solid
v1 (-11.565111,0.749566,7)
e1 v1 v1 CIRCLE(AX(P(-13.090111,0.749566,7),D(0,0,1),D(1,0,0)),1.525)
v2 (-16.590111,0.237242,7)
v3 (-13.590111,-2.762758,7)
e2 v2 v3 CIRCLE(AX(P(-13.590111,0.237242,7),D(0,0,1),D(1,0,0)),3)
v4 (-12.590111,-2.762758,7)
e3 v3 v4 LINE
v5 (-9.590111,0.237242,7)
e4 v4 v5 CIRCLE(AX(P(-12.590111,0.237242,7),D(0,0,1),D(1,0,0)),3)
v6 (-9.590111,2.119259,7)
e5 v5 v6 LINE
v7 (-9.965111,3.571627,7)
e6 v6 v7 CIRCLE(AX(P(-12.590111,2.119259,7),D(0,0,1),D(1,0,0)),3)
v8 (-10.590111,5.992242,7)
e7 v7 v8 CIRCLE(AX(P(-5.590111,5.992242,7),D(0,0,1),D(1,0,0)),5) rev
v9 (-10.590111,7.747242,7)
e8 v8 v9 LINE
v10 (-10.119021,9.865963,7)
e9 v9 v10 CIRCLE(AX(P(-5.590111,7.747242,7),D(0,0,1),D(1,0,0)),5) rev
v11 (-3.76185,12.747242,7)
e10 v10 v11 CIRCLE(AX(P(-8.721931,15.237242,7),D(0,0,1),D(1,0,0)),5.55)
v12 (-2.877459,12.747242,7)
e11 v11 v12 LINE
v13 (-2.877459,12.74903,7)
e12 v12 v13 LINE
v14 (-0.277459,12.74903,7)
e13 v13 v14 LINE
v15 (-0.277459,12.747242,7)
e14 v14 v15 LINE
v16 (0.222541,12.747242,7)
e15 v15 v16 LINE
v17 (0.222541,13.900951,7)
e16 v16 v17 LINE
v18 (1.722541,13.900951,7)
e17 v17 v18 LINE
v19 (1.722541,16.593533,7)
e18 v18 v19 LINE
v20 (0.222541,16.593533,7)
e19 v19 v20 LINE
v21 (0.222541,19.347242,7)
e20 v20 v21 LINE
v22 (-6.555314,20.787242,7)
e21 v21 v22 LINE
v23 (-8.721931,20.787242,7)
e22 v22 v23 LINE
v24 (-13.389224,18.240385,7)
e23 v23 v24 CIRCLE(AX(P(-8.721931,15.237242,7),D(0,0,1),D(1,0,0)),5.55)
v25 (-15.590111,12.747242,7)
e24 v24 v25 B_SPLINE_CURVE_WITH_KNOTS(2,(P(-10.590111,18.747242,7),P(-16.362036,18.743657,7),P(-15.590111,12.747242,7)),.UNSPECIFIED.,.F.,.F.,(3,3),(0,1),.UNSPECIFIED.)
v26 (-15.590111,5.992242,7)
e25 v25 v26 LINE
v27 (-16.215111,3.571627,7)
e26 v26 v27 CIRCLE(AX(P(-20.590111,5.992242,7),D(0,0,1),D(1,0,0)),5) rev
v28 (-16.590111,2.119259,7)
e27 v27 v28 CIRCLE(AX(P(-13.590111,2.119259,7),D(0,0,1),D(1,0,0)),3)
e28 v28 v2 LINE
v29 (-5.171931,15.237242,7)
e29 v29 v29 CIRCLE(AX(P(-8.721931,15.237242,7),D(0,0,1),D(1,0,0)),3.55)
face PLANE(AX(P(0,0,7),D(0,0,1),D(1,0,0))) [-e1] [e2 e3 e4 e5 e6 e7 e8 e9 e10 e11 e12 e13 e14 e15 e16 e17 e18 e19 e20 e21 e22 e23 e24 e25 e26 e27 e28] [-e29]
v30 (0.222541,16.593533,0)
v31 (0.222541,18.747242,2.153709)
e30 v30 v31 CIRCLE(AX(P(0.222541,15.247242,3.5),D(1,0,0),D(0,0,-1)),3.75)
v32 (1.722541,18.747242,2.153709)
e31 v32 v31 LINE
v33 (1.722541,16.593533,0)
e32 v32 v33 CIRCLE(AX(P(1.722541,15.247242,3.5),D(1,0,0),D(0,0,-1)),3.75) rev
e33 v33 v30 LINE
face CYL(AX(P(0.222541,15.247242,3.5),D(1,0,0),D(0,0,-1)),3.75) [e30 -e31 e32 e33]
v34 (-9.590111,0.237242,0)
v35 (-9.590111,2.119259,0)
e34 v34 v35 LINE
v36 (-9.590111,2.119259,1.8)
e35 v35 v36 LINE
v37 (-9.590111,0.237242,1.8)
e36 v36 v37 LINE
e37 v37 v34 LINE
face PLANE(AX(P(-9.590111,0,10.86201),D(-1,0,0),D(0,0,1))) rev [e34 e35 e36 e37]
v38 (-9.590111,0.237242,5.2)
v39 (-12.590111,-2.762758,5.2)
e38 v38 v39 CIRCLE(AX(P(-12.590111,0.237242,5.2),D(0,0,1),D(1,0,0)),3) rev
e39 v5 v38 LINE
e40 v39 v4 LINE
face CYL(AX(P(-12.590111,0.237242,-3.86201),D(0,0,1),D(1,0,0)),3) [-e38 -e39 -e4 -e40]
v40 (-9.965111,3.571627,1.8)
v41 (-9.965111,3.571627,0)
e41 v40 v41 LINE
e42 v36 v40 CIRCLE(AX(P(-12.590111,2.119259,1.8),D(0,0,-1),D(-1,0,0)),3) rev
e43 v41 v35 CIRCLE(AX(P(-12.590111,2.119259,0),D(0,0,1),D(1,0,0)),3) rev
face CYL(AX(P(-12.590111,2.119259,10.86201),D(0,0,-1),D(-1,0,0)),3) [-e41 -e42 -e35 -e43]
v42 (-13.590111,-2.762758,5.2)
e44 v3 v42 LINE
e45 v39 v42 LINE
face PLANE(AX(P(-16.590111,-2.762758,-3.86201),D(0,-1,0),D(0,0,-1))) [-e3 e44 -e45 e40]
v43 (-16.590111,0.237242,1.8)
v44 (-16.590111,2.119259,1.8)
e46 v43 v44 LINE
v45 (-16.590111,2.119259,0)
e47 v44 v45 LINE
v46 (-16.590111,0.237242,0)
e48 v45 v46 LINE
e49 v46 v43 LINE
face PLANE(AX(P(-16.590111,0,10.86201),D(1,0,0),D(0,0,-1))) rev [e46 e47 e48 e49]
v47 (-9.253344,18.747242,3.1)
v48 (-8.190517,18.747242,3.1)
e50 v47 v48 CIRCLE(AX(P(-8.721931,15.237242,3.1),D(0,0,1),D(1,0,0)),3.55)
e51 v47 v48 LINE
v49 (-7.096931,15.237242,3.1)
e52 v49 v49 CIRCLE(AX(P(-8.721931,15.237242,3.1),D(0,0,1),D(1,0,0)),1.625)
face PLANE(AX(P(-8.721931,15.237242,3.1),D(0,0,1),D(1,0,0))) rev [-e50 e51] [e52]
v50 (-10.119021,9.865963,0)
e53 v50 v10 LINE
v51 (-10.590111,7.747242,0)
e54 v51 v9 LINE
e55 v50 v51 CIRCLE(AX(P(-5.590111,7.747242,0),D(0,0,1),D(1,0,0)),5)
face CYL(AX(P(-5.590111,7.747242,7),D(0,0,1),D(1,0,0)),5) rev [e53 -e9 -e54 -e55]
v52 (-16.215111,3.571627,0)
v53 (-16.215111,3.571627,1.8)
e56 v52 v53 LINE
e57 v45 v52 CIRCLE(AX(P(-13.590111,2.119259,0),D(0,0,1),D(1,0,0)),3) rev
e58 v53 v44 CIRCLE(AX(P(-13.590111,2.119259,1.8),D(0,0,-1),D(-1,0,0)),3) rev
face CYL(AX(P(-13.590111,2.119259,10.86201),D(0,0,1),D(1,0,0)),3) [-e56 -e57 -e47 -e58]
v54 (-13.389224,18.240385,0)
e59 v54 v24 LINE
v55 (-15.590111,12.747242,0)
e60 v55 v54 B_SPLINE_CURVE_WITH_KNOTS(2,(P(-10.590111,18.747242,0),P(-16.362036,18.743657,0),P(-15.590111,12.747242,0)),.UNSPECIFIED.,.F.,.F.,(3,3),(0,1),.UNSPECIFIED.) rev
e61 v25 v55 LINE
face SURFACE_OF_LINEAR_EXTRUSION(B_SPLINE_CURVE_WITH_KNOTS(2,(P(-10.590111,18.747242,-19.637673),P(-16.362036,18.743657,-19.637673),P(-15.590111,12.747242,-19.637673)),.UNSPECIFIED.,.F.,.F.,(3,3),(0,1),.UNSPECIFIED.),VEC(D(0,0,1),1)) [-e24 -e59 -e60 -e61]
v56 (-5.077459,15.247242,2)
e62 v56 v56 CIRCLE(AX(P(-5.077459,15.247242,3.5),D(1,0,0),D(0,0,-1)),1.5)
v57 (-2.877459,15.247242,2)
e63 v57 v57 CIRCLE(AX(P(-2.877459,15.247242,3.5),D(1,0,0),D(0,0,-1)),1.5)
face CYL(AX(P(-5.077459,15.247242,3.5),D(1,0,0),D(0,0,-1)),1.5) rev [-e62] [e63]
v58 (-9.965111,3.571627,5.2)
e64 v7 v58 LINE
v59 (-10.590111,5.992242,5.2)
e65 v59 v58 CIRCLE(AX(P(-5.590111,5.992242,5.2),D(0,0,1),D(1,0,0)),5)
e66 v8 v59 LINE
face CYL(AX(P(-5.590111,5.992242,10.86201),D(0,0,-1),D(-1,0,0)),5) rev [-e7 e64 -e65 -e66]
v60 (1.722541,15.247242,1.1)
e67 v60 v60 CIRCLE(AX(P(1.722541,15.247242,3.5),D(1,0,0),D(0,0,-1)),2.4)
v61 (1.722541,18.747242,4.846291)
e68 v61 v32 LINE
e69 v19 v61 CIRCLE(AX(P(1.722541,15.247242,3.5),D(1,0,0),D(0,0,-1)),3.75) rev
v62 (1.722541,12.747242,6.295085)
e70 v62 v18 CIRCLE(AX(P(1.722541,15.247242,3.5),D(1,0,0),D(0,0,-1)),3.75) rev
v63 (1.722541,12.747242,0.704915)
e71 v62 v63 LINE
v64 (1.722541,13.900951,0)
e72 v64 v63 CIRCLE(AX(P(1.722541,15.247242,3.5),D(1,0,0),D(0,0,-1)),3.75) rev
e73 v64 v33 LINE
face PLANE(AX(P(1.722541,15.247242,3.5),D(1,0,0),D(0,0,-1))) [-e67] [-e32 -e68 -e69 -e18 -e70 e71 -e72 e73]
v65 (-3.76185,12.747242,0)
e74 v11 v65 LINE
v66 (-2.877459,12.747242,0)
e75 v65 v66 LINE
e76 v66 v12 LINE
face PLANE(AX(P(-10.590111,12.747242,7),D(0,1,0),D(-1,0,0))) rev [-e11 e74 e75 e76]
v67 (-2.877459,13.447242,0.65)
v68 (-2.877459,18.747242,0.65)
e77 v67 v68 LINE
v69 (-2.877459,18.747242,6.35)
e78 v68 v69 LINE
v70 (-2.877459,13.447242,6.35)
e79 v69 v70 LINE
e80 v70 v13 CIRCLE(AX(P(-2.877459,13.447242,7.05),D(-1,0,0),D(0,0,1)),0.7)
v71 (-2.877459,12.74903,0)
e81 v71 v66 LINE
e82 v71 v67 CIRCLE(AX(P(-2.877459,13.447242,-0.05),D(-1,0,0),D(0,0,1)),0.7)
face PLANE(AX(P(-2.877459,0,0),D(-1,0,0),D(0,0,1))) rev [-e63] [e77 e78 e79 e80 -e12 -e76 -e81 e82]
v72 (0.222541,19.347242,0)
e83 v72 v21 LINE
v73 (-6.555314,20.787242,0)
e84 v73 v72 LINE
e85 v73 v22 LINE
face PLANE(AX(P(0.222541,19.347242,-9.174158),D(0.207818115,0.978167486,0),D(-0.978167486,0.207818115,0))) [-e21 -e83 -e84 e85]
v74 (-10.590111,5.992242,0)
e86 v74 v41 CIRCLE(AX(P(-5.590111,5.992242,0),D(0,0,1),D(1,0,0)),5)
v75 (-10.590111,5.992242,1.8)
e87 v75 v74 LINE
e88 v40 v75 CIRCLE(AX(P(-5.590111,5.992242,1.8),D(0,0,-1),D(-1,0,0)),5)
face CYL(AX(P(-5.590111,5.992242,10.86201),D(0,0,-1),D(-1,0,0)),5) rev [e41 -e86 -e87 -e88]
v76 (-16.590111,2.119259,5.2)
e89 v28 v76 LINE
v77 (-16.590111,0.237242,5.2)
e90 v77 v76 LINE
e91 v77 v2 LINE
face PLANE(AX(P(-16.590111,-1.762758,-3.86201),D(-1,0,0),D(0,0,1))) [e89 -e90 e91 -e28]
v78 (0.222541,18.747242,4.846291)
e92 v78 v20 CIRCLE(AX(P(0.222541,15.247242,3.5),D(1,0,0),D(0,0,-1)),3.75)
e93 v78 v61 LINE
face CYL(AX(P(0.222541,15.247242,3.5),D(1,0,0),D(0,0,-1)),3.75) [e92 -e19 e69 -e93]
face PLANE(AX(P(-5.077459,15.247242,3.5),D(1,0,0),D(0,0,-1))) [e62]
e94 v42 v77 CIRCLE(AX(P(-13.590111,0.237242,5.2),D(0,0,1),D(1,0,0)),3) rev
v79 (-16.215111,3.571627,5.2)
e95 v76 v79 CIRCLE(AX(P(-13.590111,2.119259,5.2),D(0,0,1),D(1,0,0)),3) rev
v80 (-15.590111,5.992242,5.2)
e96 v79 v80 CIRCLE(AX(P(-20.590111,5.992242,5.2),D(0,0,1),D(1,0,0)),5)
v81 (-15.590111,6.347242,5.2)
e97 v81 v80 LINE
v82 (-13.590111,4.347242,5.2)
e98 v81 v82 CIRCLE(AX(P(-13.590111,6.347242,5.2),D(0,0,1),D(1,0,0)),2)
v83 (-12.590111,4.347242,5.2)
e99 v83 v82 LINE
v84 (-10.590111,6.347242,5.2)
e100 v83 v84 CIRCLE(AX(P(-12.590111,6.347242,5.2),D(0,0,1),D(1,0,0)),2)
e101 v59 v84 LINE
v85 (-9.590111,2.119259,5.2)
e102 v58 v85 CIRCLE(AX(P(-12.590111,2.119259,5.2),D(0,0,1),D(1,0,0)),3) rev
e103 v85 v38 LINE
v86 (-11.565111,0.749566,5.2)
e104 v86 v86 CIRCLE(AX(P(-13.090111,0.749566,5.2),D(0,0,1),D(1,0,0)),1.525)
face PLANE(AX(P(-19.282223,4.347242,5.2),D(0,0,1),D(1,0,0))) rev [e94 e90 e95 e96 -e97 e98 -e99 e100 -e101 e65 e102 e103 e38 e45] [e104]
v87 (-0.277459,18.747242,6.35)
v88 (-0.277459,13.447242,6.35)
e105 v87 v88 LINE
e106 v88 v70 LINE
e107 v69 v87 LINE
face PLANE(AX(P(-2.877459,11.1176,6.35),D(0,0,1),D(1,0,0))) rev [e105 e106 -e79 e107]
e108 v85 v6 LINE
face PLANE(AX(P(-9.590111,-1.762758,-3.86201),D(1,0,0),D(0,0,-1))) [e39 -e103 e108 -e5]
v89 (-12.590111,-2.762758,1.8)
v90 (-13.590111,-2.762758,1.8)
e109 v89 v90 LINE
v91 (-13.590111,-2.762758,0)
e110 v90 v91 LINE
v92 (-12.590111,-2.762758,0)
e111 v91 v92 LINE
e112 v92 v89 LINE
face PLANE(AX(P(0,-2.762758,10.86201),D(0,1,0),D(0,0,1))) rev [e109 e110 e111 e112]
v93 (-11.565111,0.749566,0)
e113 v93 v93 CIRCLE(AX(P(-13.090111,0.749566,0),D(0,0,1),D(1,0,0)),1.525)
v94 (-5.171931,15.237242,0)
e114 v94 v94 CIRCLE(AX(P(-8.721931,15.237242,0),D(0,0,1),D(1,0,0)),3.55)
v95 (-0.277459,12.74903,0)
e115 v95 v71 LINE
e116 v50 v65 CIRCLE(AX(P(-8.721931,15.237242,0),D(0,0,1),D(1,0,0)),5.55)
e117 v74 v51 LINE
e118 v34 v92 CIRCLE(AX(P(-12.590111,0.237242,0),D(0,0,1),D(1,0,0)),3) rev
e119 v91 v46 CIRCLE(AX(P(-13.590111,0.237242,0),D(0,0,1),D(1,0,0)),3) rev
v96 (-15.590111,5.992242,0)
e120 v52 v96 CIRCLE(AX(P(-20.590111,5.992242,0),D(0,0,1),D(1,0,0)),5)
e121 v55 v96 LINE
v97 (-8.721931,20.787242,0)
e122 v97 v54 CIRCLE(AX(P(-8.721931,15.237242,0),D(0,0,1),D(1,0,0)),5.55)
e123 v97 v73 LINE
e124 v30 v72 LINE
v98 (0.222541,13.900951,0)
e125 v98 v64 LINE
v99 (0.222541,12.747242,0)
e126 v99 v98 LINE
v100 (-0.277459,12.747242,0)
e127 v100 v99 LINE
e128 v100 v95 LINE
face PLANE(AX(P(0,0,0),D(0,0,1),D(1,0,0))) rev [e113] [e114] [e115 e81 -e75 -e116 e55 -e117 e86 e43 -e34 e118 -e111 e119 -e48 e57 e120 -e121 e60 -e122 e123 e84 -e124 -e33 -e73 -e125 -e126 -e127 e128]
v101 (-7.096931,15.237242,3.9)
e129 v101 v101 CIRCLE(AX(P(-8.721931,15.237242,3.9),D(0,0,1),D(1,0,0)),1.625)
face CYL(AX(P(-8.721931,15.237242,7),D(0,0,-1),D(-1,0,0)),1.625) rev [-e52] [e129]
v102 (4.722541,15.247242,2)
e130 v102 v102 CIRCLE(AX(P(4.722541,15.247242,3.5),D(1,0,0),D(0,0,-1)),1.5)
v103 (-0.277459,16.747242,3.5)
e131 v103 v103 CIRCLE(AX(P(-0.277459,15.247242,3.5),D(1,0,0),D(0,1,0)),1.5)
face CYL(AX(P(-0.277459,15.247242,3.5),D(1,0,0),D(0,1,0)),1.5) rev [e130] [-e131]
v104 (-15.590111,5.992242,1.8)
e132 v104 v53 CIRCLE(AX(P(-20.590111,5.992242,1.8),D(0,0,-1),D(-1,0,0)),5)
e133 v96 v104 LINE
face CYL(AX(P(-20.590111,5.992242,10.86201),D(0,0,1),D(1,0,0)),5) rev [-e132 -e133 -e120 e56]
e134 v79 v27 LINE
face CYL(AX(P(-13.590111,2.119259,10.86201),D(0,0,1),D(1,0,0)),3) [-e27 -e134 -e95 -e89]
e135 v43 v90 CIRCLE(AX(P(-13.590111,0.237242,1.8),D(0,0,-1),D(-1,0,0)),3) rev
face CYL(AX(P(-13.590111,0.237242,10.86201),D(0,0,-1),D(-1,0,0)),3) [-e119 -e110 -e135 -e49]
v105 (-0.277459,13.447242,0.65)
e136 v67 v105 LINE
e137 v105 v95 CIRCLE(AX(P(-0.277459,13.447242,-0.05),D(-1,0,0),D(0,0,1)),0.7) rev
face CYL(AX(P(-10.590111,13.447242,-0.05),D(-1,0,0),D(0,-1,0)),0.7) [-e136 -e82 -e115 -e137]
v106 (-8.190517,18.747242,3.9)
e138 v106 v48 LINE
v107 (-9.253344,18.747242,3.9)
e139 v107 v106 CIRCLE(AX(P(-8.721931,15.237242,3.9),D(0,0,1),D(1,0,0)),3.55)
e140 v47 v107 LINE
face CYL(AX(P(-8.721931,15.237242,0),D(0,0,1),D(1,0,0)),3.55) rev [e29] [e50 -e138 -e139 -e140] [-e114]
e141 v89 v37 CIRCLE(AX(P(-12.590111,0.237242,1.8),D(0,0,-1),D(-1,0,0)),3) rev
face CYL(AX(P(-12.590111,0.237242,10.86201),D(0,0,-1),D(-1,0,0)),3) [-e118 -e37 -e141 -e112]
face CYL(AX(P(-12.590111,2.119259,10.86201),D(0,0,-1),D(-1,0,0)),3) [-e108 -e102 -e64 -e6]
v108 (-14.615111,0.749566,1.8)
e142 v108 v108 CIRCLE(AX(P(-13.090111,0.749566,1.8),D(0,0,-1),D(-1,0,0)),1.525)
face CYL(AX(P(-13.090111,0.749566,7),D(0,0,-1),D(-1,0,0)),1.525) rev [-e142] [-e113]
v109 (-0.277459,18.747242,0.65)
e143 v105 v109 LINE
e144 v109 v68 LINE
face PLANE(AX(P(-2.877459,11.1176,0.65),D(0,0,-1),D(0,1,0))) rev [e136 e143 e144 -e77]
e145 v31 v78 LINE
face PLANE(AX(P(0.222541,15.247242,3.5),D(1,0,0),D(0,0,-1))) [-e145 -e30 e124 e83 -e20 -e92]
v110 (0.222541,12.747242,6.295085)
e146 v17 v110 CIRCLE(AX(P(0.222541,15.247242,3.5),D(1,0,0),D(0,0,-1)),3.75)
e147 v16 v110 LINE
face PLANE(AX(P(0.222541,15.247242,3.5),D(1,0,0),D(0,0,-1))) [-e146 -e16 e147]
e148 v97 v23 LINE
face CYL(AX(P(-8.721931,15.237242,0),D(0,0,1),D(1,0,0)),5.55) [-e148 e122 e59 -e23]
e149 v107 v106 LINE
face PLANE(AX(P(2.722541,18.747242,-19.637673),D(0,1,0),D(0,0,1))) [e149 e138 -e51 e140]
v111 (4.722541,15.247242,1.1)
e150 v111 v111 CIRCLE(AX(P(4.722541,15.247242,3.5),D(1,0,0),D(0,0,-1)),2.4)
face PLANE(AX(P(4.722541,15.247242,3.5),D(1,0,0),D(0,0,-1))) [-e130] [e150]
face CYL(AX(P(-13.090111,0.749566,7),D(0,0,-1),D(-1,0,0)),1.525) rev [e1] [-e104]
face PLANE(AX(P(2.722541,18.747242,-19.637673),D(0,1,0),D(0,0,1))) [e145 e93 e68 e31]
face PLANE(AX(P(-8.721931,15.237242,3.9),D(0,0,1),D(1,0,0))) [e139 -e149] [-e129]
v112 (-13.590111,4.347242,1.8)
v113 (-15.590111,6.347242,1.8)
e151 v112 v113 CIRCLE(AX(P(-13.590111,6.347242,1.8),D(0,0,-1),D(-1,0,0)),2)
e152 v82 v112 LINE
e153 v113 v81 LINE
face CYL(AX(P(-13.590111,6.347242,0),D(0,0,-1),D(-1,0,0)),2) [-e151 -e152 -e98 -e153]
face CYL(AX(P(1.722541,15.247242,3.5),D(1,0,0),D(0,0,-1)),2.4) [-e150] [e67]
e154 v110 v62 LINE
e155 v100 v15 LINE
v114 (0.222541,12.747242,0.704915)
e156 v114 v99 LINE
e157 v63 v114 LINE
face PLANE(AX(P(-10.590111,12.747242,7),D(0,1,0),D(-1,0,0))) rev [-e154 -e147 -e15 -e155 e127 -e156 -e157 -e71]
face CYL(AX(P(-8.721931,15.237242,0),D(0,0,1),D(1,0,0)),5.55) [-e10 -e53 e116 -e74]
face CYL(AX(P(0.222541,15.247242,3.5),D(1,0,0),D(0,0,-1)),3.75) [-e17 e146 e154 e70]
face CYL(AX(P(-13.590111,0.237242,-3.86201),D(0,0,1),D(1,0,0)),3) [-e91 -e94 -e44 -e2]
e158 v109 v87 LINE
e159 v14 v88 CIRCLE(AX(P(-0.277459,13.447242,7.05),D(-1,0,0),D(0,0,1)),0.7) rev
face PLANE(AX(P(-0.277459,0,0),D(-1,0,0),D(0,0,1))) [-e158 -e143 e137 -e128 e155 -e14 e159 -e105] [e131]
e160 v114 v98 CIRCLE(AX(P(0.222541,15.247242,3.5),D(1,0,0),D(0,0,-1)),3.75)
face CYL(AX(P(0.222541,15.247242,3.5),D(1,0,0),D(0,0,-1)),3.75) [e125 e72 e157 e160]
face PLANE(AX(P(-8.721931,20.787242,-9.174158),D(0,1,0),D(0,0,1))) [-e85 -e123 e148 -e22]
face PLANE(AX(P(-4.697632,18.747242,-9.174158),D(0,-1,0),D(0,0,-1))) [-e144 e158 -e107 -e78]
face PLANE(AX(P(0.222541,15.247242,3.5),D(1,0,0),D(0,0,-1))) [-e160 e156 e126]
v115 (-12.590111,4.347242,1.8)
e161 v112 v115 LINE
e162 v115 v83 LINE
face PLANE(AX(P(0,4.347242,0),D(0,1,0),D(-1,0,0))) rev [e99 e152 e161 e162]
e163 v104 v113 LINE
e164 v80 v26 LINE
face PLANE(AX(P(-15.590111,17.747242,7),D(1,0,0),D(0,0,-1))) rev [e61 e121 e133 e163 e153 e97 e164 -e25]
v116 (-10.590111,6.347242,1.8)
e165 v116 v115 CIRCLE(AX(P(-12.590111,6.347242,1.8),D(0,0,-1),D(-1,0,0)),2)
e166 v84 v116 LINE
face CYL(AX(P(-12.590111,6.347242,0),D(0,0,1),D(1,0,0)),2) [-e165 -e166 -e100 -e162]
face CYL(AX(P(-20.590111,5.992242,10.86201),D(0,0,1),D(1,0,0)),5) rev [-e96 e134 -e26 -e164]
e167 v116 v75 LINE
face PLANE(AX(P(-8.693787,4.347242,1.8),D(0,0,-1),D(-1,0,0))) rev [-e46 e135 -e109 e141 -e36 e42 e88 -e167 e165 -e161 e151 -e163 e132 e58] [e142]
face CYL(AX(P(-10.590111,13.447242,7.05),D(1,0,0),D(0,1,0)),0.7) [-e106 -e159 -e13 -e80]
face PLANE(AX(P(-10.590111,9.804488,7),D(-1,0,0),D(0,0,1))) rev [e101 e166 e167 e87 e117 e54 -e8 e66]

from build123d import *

# Parameters (mm, degrees)
SKETCH1_R           = 1.625
SKETCH1_R_2         = 1.525
BOSS_EXTRUDE1_DEPTH = 7
SKETCH2_R           = 1.5
CUT_EXTRUDE1_DEPTH  = 3
SKETCH3_W           = 10.588435917
SKETCH3_H           = 3.4
CUT_EXTRUDE2_DEPTH  = 6.11
FILLET1_R           = 5
BOSS_EXTRUDE2_DEPTH = 7
BOSS_EXTRUDE3_DEPTH = 1.8
BOSS_EXTRUDE4_START = -7
BOSS_EXTRUDE4_DEPTH = 1.8
FILLET4_R           = 5
FILLET5_R           = 3
FILLET6_R           = 2
CUT_EXTRUDE3_START  = -3
SKETCH8_W           = 5.7
SKETCH8_H           = 8.259283933
CUT_EXTRUDE3_DEPTH  = 2.6
FILLET7_R           = 0.7
SKETCH9_R           = 5.326360015
SKETCH9_R_2         = 3.75
CUT_EXTRUDE5_DEPTH  = 2.5
SKETCH10_R          = 4.869989517
SKETCH10_R_2        = 2.4
CUT_EXTRUDE6_DEPTH  = 1
BOSS_EXTRUDE5_START = 2
SKETCH11_R          = 2.4
SKETCH11_R_2        = 1.5
BOSS_EXTRUDE5_DEPTH = 2
CUT_EXTRUDE7_START  = -7
SKETCH12_R          = 3.575
CUT_EXTRUDE7_DEPTH  = 3.1
CUT_EXTRUDE8_START  = -3.1
SKETCH14_R          = 3.575
CUT_EXTRUDE8_DEPTH  = 3.1
SKETCH15_R          = 5.55
SKETCH15_R_2        = 3.55
BOSS_EXTRUDE6_DEPTH = 7
SKETCH16_R          = 1.407083064
BOSS_EXTRUDE7_DEPTH = 1
SKETCH17_R          = 1.5
CUT_EXTRUDE9_DEPTH  = 2.2
BOSS_EXTRUDE8_DEPTH = 7
CUT_EXTRUDE10_START = -3.1
SKETCH19_R          = 3.55
CUT_EXTRUDE10_DEPTH = 3.1


with BuildPart() as part:
    # Sketch1 → Boss-Extrude1 (new body)
    with BuildSketch(Plane.XY):
        Polygon((2.722541385, 17.747241978), (-15.590111015, 17.747241978), (-15.590111015, -1.762758022), (-10.590111015, -1.762758022), (-10.590111015, 9.80448846), (-10.590111015, 12.747241978), (2.722541385, 12.747241978), align=None)
        with Locations((-8.721930535, 15.237241978)):
            Circle(SKETCH1_R, mode=Mode.SUBTRACT)
        with Locations((-13.090111015, 0.749566092)):
            Circle(SKETCH1_R_2, mode=Mode.SUBTRACT)
    extrude(amount=BOSS_EXTRUDE1_DEPTH)

    # Sketch2 → Cut-Extrude1 (cut)
    with BuildSketch(Plane(origin=(2.722541385, 0, 0), x_dir=(0, 0, -1), z_dir=(1, 0, 0))):
        with Locations(Location((-3.5, 15.247241978, 0), (0, 0, 90))):
            Circle(SKETCH2_R)
    extrude(amount=-CUT_EXTRUDE1_DEPTH, mode=Mode.SUBTRACT)

    # Sketch3 → Cut-Extrude2 (cut)
    with BuildSketch(Plane.XZ.offset(1.762758022)):
        with Locations((-13.988004801, 3.5)):
            Rectangle(SKETCH3_W, SKETCH3_H)
    extrude(amount=-CUT_EXTRUDE2_DEPTH, mode=Mode.SUBTRACT)

    # Fillet1
    fillet1_edges = [part.edges().sort_by_distance(p)[0] for p in [
        (-10.590111015, 12.747241978, 3.5),
        (-15.590111015, 17.747241978, 3.5),
    ]]
    fillet(fillet1_edges, radius=FILLET1_R)

    # Sketch5 → Boss-Extrude2 (add)
    with BuildSketch(Plane.XY.offset(7)):
        with BuildLine():
            Line((2.722541385, 17.747241978), (-10.590111015, 17.747241978))
            Line((-10.590111015, 17.747241978), (-15.590111015, 12.747241978))
            add(Edge.make_bspline(
                [(-10.590111015, 18.747241978), (-16.362035667, 18.743656789), (-15.590111015, 12.747241978)],
                knots=[0, 0, 0, 1, 1, 1], degree=2))
            Line((-10.590111015, 18.747241978), (2.722541385, 18.747241978))
            Line((2.722541385, 18.747241978), (2.722541385, 17.747241978))
        make_face()
    extrude(amount=-BOSS_EXTRUDE2_DEPTH)

    # Sketch7 → Boss-Extrude3 (add)
    with BuildSketch(Plane.XY.offset(7)):
        Polygon((-10.590111015, -1.762758022), (-10.590111015, 2.992241978), (-9.590111015, 2.992241978), (-9.590111015, -1.762758022), (-9.590111015, -2.762758022), (-16.590111015, -2.762758022), (-16.590111015, -1.762758022), (-16.590111015, 2.992241978), (-15.590111015, 2.992241978), (-15.590111015, -1.762758022), align=None)
    extrude(amount=-BOSS_EXTRUDE3_DEPTH)

    # Sketch7<2> → Boss-Extrude4 (add)
    with BuildSketch(Plane.XY.offset(7).offset(BOSS_EXTRUDE4_START)):
        Polygon((-10.590111015, -1.762758022), (-10.590111015, 2.992241978), (-9.590111015, 2.992241978), (-9.590111015, -1.762758022), (-9.590111015, -2.762758022), (-16.590111015, -2.762758022), (-16.590111015, -1.762758022), (-16.590111015, 2.992241978), (-15.590111015, 2.992241978), (-15.590111015, -1.762758022), align=None)
    extrude(amount=BOSS_EXTRUDE4_DEPTH)

    # Fillet4
    # the kernel refuses this fillet: 5 mm, written as the material it adds along each edge
    with BuildSketch(Plane(origin=(-15.590111015, 2.992241978, 0), x_dir=(0, 1, 0), z_dir=(0, 0, 1))) as fillet4_piece_1_section:
        with BuildLine():
            CenterArc((3, 5), FILLET4_R, 233.130102354, 36.869897646)
            Line((0, 1), (-0.06, 0.92))
            ThreePointArc((-0.06, 0.92), (-0.1, 0.5), (-0.1, 0))
            Line((-0.1, 0), (0, -0.1))
            Line((0, -0.1), (3, -0.1))
            Line((3, -0.1), (3, 0))
        make_face()
    fillet4_piece_1 = extrude(amount=1.8, mode=Mode.PRIVATE)
    fillet4_piece_1 = split(fillet4_piece_1, bisect_by=Plane(origin=(-15.603784391, 4.347241978, 0.9), z_dir=(0, 1, 0)), keep=Keep.TOP, mode=Mode.PRIVATE)
    add(fillet4_piece_1)
    with BuildSketch(Plane(origin=(-15.590111015, 2.992241978, 0), x_dir=(0, 1, 0), z_dir=(0, 0, 1))) as fillet4_piece_2_section:
        with BuildLine():
            CenterArc((3, 5), FILLET4_R, 233.130102354, 36.869897646)
            Line((0, 1), (-0.06, 0.92))
            ThreePointArc((-0.06, 0.92), (-0.1, 0.5), (-0.1, 0))
            Line((-0.1, 0), (0, -0.1))
            Line((0, -0.1), (3, -0.1))
            Line((3, -0.1), (3, 0))
        make_face()
    fillet4_piece_2 = extrude(amount=1.8, mode=Mode.PRIVATE)
    fillet4_piece_2 = split(fillet4_piece_2, bisect_by=Plane(origin=(-15.881039753, 4.347241978, 0.9), z_dir=(0, -1, 0)), keep=Keep.TOP, mode=Mode.PRIVATE)
    add(fillet4_piece_2)
    with BuildSketch(Plane(origin=(-15.590111015, 2.992241978, 0), x_dir=(0, 1, 0), z_dir=(0, 0, 1))) as fillet4_piece_3_section:
        with BuildLine():
            CenterArc((3, 5), FILLET4_R, 233.130102354, 36.869897646)
            Line((0, 1), (-0.06, 0.92))
            ThreePointArc((-0.06, 0.92), (-0.1, 0.5), (-0.1, 0))
            Line((-0.1, 0), (0, -0.1))
            Line((0, -0.1), (3, -0.1))
            Line((3, -0.1), (3, 0))
        make_face()
    fillet4_piece_3 = extrude(amount=9.3, mode=Mode.PRIVATE)
    fillet4_piece_3 = split(fillet4_piece_3, bisect_by=Plane(origin=(-15.603784391, 4.971879793, 1.8), z_dir=(0, 0, 1)), keep=Keep.TOP, mode=Mode.PRIVATE)
    fillet4_piece_3 = split(fillet4_piece_3, bisect_by=Plane(origin=(-15.603784391, 4.347241978, 3.5), z_dir=(0, 1, 0)), keep=Keep.TOP, mode=Mode.PRIVATE)
    fillet4_piece_3 = split(fillet4_piece_3, bisect_by=Plane(origin=(-15.603784391, 4.971879793, 5.2), z_dir=(0, 0, -1)), keep=Keep.TOP, mode=Mode.PRIVATE)
    add(fillet4_piece_3)
    with BuildSketch(Plane(origin=(-15.590111015, 2.992241978, 0), x_dir=(0, 1, 0), z_dir=(0, 0, 1))) as fillet4_piece_4_section:
        with BuildLine():
            CenterArc((3, 5), FILLET4_R, 233.130102354, 36.869897646)
            Line((0, 1), (-0.06, 0.92))
            ThreePointArc((-0.06, 0.92), (-0.1, 0.5), (-0.1, 0))
            Line((-0.1, 0), (0, -0.1))
            Line((0, -0.1), (3, -0.1))
            Line((3, -0.1), (3, 0))
        make_face()
    fillet4_piece_4 = extrude(amount=9.3, mode=Mode.PRIVATE)
    fillet4_piece_4 = split(fillet4_piece_4, bisect_by=Plane(origin=(-15.603784391, 4.347241978, 6.1), z_dir=(0, 1, 0)), keep=Keep.TOP, mode=Mode.PRIVATE)
    fillet4_piece_4 = split(fillet4_piece_4, bisect_by=Plane(origin=(-15.603784391, 4.971879793, 5.2), z_dir=(0, 0, 1)), keep=Keep.TOP, mode=Mode.PRIVATE)
    fillet4_piece_4 = split(fillet4_piece_4, bisect_by=Plane(origin=(-15.603784391, 4.971879793, 7), z_dir=(0, 0, -1)), keep=Keep.TOP, mode=Mode.PRIVATE)
    add(fillet4_piece_4)
    with BuildSketch(Plane(origin=(-15.590111015, 2.992241978, 0), x_dir=(0, 1, 0), z_dir=(0, 0, 1))) as fillet4_piece_5_section:
        with BuildLine():
            CenterArc((3, 5), FILLET4_R, 233.130102354, 36.869897646)
            Line((0, 1), (-0.06, 0.92))
            ThreePointArc((-0.06, 0.92), (-0.1, 0.5), (-0.1, 0))
            Line((-0.1, 0), (0, -0.1))
            Line((0, -0.1), (3, -0.1))
            Line((3, -0.1), (3, 0))
        make_face()
    fillet4_piece_5 = extrude(amount=9.3, mode=Mode.PRIVATE)
    fillet4_piece_5 = split(fillet4_piece_5, bisect_by=Plane(origin=(-15.881039753, 4.347241978, 6.1), z_dir=(0, -1, 0)), keep=Keep.TOP, mode=Mode.PRIVATE)
    fillet4_piece_5 = split(fillet4_piece_5, bisect_by=Plane(origin=(-15.881039753, 3.497683508, 5.2), z_dir=(0, 0, 1)), keep=Keep.TOP, mode=Mode.PRIVATE)
    fillet4_piece_5 = split(fillet4_piece_5, bisect_by=Plane(origin=(-15.881039753, 3.497683508, 7), z_dir=(0, 0, -1)), keep=Keep.TOP, mode=Mode.PRIVATE)
    add(fillet4_piece_5)
    with BuildSketch(Plane(origin=(-10.590111015, 2.992241978, 0), x_dir=(0, 1, 0), z_dir=(0, 0, 1))) as fillet4_piece_6_section:
        with BuildLine():
            CenterArc((3, -5), FILLET4_R, 90, 36.869897646)
            Line((0, -1), (-0.06, -0.92))
            ThreePointArc((-0.06, -0.92), (-0.1, -0.5), (-0.1, 0))
            Line((-0.1, 0), (0, 0.1))
            Line((0, 0.1), (3, 0.1))
            Line((3, 0.1), (3, 0))
        make_face()
    fillet4_piece_6 = extrude(amount=1.8, mode=Mode.PRIVATE)
    fillet4_piece_6 = split(fillet4_piece_6, bisect_by=Plane(origin=(-10.576437639, 4.347241978, 0.9), z_dir=(0, 1, 0)), keep=Keep.TOP, mode=Mode.PRIVATE)
    add(fillet4_piece_6)
    with BuildSketch(Plane(origin=(-10.590111015, 2.992241978, 0), x_dir=(0, 1, 0), z_dir=(0, 0, 1))) as fillet4_piece_7_section:
        with BuildLine():
            CenterArc((3, -5), FILLET4_R, 90, 36.869897646)
            Line((0, -1), (-0.06, -0.92))
            ThreePointArc((-0.06, -0.92), (-0.1, -0.5), (-0.1, 0))
            Line((-0.1, 0), (0, 0.1))
            Line((0, 0.1), (3, 0.1))
            Line((3, 0.1), (3, 0))
        make_face()
    fillet4_piece_7 = extrude(amount=1.8, mode=Mode.PRIVATE)
    fillet4_piece_7 = split(fillet4_piece_7, bisect_by=Plane(origin=(-10.299182277, 4.347241978, 0.9), z_dir=(0, -1, 0)), keep=Keep.TOP, mode=Mode.PRIVATE)
    add(fillet4_piece_7)
    with BuildSketch(Plane(origin=(-10.590111015, 2.992241978, 0), x_dir=(0, 1, 0), z_dir=(0, 0, 1))) as fillet4_piece_8_section:
        with BuildLine():
            CenterArc((3, -5), FILLET4_R, 90, 36.869897646)
            Line((0, -1), (-0.06, -0.92))
            ThreePointArc((-0.06, -0.92), (-0.1, -0.5), (-0.1, 0))
            Line((-0.1, 0), (0, 0.1))
            Line((0, 0.1), (3, 0.1))
            Line((3, 0.1), (3, 0))
        make_face()
    fillet4_piece_8 = extrude(amount=9.3, mode=Mode.PRIVATE)
    fillet4_piece_8 = split(fillet4_piece_8, bisect_by=Plane(origin=(-10.576437639, 4.971879793, 5.2), z_dir=(0, 0, -1)), keep=Keep.TOP, mode=Mode.PRIVATE)
    fillet4_piece_8 = split(fillet4_piece_8, bisect_by=Plane(origin=(-10.576437639, 4.347241978, 3.5), z_dir=(0, 1, 0)), keep=Keep.TOP, mode=Mode.PRIVATE)
    fillet4_piece_8 = split(fillet4_piece_8, bisect_by=Plane(origin=(-10.576437639, 4.971879793, 1.8), z_dir=(0, 0, 1)), keep=Keep.TOP, mode=Mode.PRIVATE)
    add(fillet4_piece_8)
    with BuildSketch(Plane(origin=(-10.590111015, 2.992241978, 0), x_dir=(0, 1, 0), z_dir=(0, 0, 1))) as fillet4_piece_9_section:
        with BuildLine():
            CenterArc((3, -5), FILLET4_R, 90, 36.869897646)
            Line((0, -1), (-0.06, -0.92))
            ThreePointArc((-0.06, -0.92), (-0.1, -0.5), (-0.1, 0))
            Line((-0.1, 0), (0, 0.1))
            Line((0, 0.1), (3, 0.1))
            Line((3, 0.1), (3, 0))
        make_face()
    fillet4_piece_9 = extrude(amount=9.3, mode=Mode.PRIVATE)
    fillet4_piece_9 = split(fillet4_piece_9, bisect_by=Plane(origin=(-10.576437639, 4.971879793, 7), z_dir=(0, 0, -1)), keep=Keep.TOP, mode=Mode.PRIVATE)
    fillet4_piece_9 = split(fillet4_piece_9, bisect_by=Plane(origin=(-10.576437639, 4.971879793, 5.2), z_dir=(0, 0, 1)), keep=Keep.TOP, mode=Mode.PRIVATE)
    fillet4_piece_9 = split(fillet4_piece_9, bisect_by=Plane(origin=(-10.576437639, 4.347241978, 6.1), z_dir=(0, 1, 0)), keep=Keep.TOP, mode=Mode.PRIVATE)
    add(fillet4_piece_9)
    with BuildSketch(Plane(origin=(-10.590111015, 2.992241978, 0), x_dir=(0, 1, 0), z_dir=(0, 0, 1))) as fillet4_piece_10_section:
        with BuildLine():
            CenterArc((3, -5), FILLET4_R, 90, 36.869897646)
            Line((0, -1), (-0.06, -0.92))
            ThreePointArc((-0.06, -0.92), (-0.1, -0.5), (-0.1, 0))
            Line((-0.1, 0), (0, 0.1))
            Line((0, 0.1), (3, 0.1))
            Line((3, 0.1), (3, 0))
        make_face()
    fillet4_piece_10 = extrude(amount=9.3, mode=Mode.PRIVATE)
    fillet4_piece_10 = split(fillet4_piece_10, bisect_by=Plane(origin=(-10.299182277, 3.497683508, 7), z_dir=(0, 0, -1)), keep=Keep.TOP, mode=Mode.PRIVATE)
    fillet4_piece_10 = split(fillet4_piece_10, bisect_by=Plane(origin=(-10.299182277, 3.497683508, 5.2), z_dir=(0, 0, 1)), keep=Keep.TOP, mode=Mode.PRIVATE)
    fillet4_piece_10 = split(fillet4_piece_10, bisect_by=Plane(origin=(-10.299182277, 4.347241978, 6.1), z_dir=(0, -1, 0)), keep=Keep.TOP, mode=Mode.PRIVATE)
    add(fillet4_piece_10)

    # Fillet5
    fillet5_edges = [part.edges().sort_by_distance(p)[0] for p in [
        (-9.590111015, 2.992241978, 6.1),
        (-9.590111015, -2.762758022, 6.1),
        (-16.590111015, -2.762758022, 6.1),
        (-16.590111015, 2.992241978, 6.1),
        (-9.590111015, 2.992241978, 0.9),
        (-9.590111015, -2.762758022, 0.9),
        (-16.590111015, -2.762758022, 0.9),
        (-16.590111015, 2.992241978, 0.9),
    ]]
    fillet(fillet5_edges, radius=FILLET5_R)

    # Fillet6
    # the kernel refuses this fillet: 2 mm, written as the material it takes off along each edge
    with BuildSketch(Plane(origin=(-15.868461409, 4.347241978, 1.8), x_dir=(1, 0, 0), z_dir=(0, 0, 1))) as fillet6_piece_1:
        with BuildLine():
            CenterArc((2.278350394, 2), FILLET6_R, 180, 90)
            Line((0.278350394, 2), (0.078350394, 2))
            ThreePointArc((0.078350394, 2), (0.078350394, 1.645), (-0.188865984, 0.0658))
            Line((-0.188865984, 0.0658), (0, -0.2))
            Line((0, -0.2), (2.278350394, -0.2))
            Line((2.278350394, -0.2), (2.278350394, 0))
        make_face()
    extrude(amount=3.4, mode=Mode.SUBTRACT)
    with BuildSketch(Plane(origin=(-10.311760621, 4.347241978, 5.2), x_dir=(-0.13784657416957666, 0.9904535940616861, 0), z_dir=(0, 0, -1))) as fillet6_piece_2:
        with BuildLine():
            CenterArc((2.294969985, -1.980907188), FILLET6_R, 97.923255875, 90)
            Line((0.314062797, -2.256600336), (0.115972078, -2.284169651))
            Line((0.115972078, -2.284169651), (-0.198090719, -0.027569315))
            Line((-0.198090719, -0.027569315), (0.039137318, 0.196133297))
            ThreePointArc((0.039137318, 0.196133297), (1.640096496, 0.149155185), (1.991707522, 0.198090719))
            Line((1.991707522, 0.198090719), (2.019276836, 0))
        make_face()
    extrude(amount=3.4, mode=Mode.SUBTRACT)

    # Sketch8 → Cut-Extrude3 (cut)
    with BuildSketch(Plane(origin=(2.722541385, 0, 0), x_dir=(0, 0, -1), z_dir=(1, 0, 0)).offset(CUT_EXTRUDE3_START)):
        with Locations((-3.5, 15.247241978)):
            Rectangle(SKETCH8_W, SKETCH8_H)
    extrude(amount=-CUT_EXTRUDE3_DEPTH, mode=Mode.SUBTRACT)

    # Fillet7
    # the kernel refuses this fillet: 0.7 mm, written as the material it takes off along each edge
    with BuildSketch(Plane(origin=(-0.277458615, 12.747241978, 0.65), x_dir=(0, 0, -1), z_dir=(-1, 0, 0)), Plane(origin=(-2.877458615, 12.747241978, 6.35), x_dir=(0, 0, 1), z_dir=(1, 0, 0))) as fillet7_piece_1:
        with BuildLine():
            CenterArc((FILLET7_R, -FILLET7_R), FILLET7_R, 90, 90)
            Line((0, -FILLET7_R), (0, 0))
            Line((0, 0), (FILLET7_R, 0))
        make_face()
    extrude(amount=2.6, mode=Mode.SUBTRACT)

    # Sketch9 → Cut-Extrude5 (cut)
    with BuildSketch(Plane(origin=(2.722541385, 0, 0), x_dir=(0, 0, -1), z_dir=(1, 0, 0))):
        with Locations((-3.5, 15.247241978)):
            Circle(SKETCH9_R)
        with Locations((-3.5, 15.247241978)):
            Circle(SKETCH9_R_2, mode=Mode.SUBTRACT)
    extrude(amount=-CUT_EXTRUDE5_DEPTH, mode=Mode.SUBTRACT)

    # Sketch10 → Cut-Extrude6 (cut)
    with BuildSketch(Plane(origin=(2.722541385, 0, 0), x_dir=(0, 0, -1), z_dir=(1, 0, 0))):
        with Locations((-3.5, 15.247241978)):
            Circle(SKETCH10_R)
        with Locations((-3.5, 15.247241978)):
            Circle(SKETCH10_R_2, mode=Mode.SUBTRACT)
    extrude(amount=-CUT_EXTRUDE6_DEPTH, mode=Mode.SUBTRACT)

    # Sketch11 → Boss-Extrude5 (add)
    with BuildSketch(Plane(origin=(2.722541385, 0, 0), x_dir=(0, 0, -1), z_dir=(1, 0, 0)).offset(BOSS_EXTRUDE5_START)):
        with Locations((-3.5, 15.247241978)):
            Circle(SKETCH11_R)
        with Locations(Location((-3.5, 15.247241978, 0), (0, 0, 90))):
            Circle(SKETCH11_R_2, mode=Mode.SUBTRACT)
    extrude(amount=-BOSS_EXTRUDE5_DEPTH)

    # Sketch12 → Cut-Extrude7 (cut)
    with BuildSketch(Plane.XY.offset(7).offset(CUT_EXTRUDE7_START)):
        with Locations((-8.721930535, 15.237241978)):
            Circle(SKETCH12_R)
    extrude(amount=CUT_EXTRUDE7_DEPTH, mode=Mode.SUBTRACT)

    # Sketch14 → Cut-Extrude8 (cut)
    with BuildSketch(Plane.XY.offset(7).offset(CUT_EXTRUDE8_START)):
        with Locations((-8.721930535, 15.237241978)):
            Circle(SKETCH14_R)
    extrude(amount=CUT_EXTRUDE8_DEPTH, mode=Mode.SUBTRACT)

    # Sketch15 → Boss-Extrude6 (add)
    with BuildSketch(Plane.XY.offset(7)):
        with Locations((-8.721930535, 15.237241978)):
            Circle(SKETCH15_R)
        with Locations((-8.721930535, 15.237241978)):
            Circle(SKETCH15_R_2, mode=Mode.SUBTRACT)
    extrude(amount=-BOSS_EXTRUDE6_DEPTH)

    # Sketch16 → Boss-Extrude7 (add)
    with BuildSketch(Plane.XY.offset(3.9)):
        with Locations((-7.473849804, 12.118973855)):
            Circle(SKETCH16_R)
    extrude(amount=-BOSS_EXTRUDE7_DEPTH)

    # Sketch17 → Cut-Extrude9 (cut)
    with BuildSketch(Plane(origin=(-2.877458615, 0, 0), x_dir=(0, 0, -1), z_dir=(1, 0, 0))):
        with Locations(Location((-3.5, 15.247241978, 0), (0, 0, 90))):
            Circle(SKETCH17_R)
    extrude(amount=-CUT_EXTRUDE9_DEPTH, mode=Mode.SUBTRACT)

    # Sketch18 → Boss-Extrude8 (add)
    with BuildSketch(Plane.XY.offset(7)):
        Polygon((-4.697631712, 18.747241978), (0.222541385, 18.747241978), (0.222541385, 19.347241978), (-6.555314255, 20.787241978), (-8.721930535, 20.787241978), align=None)
    extrude(amount=-BOSS_EXTRUDE8_DEPTH)

    # Sketch19 → Cut-Extrude10 (cut)
    with BuildSketch(Plane(origin=(0, 0, 0), x_dir=(-1, 0, 0), z_dir=(0, 0, -1)).offset(CUT_EXTRUDE10_START)):
        with Locations(Location((8.721930535, 15.237241978, 0), (0, 0, 180))):
            Circle(SKETCH19_R)
    extrude(amount=CUT_EXTRUDE10_DEPTH, mode=Mode.SUBTRACT)


solid = part.part
